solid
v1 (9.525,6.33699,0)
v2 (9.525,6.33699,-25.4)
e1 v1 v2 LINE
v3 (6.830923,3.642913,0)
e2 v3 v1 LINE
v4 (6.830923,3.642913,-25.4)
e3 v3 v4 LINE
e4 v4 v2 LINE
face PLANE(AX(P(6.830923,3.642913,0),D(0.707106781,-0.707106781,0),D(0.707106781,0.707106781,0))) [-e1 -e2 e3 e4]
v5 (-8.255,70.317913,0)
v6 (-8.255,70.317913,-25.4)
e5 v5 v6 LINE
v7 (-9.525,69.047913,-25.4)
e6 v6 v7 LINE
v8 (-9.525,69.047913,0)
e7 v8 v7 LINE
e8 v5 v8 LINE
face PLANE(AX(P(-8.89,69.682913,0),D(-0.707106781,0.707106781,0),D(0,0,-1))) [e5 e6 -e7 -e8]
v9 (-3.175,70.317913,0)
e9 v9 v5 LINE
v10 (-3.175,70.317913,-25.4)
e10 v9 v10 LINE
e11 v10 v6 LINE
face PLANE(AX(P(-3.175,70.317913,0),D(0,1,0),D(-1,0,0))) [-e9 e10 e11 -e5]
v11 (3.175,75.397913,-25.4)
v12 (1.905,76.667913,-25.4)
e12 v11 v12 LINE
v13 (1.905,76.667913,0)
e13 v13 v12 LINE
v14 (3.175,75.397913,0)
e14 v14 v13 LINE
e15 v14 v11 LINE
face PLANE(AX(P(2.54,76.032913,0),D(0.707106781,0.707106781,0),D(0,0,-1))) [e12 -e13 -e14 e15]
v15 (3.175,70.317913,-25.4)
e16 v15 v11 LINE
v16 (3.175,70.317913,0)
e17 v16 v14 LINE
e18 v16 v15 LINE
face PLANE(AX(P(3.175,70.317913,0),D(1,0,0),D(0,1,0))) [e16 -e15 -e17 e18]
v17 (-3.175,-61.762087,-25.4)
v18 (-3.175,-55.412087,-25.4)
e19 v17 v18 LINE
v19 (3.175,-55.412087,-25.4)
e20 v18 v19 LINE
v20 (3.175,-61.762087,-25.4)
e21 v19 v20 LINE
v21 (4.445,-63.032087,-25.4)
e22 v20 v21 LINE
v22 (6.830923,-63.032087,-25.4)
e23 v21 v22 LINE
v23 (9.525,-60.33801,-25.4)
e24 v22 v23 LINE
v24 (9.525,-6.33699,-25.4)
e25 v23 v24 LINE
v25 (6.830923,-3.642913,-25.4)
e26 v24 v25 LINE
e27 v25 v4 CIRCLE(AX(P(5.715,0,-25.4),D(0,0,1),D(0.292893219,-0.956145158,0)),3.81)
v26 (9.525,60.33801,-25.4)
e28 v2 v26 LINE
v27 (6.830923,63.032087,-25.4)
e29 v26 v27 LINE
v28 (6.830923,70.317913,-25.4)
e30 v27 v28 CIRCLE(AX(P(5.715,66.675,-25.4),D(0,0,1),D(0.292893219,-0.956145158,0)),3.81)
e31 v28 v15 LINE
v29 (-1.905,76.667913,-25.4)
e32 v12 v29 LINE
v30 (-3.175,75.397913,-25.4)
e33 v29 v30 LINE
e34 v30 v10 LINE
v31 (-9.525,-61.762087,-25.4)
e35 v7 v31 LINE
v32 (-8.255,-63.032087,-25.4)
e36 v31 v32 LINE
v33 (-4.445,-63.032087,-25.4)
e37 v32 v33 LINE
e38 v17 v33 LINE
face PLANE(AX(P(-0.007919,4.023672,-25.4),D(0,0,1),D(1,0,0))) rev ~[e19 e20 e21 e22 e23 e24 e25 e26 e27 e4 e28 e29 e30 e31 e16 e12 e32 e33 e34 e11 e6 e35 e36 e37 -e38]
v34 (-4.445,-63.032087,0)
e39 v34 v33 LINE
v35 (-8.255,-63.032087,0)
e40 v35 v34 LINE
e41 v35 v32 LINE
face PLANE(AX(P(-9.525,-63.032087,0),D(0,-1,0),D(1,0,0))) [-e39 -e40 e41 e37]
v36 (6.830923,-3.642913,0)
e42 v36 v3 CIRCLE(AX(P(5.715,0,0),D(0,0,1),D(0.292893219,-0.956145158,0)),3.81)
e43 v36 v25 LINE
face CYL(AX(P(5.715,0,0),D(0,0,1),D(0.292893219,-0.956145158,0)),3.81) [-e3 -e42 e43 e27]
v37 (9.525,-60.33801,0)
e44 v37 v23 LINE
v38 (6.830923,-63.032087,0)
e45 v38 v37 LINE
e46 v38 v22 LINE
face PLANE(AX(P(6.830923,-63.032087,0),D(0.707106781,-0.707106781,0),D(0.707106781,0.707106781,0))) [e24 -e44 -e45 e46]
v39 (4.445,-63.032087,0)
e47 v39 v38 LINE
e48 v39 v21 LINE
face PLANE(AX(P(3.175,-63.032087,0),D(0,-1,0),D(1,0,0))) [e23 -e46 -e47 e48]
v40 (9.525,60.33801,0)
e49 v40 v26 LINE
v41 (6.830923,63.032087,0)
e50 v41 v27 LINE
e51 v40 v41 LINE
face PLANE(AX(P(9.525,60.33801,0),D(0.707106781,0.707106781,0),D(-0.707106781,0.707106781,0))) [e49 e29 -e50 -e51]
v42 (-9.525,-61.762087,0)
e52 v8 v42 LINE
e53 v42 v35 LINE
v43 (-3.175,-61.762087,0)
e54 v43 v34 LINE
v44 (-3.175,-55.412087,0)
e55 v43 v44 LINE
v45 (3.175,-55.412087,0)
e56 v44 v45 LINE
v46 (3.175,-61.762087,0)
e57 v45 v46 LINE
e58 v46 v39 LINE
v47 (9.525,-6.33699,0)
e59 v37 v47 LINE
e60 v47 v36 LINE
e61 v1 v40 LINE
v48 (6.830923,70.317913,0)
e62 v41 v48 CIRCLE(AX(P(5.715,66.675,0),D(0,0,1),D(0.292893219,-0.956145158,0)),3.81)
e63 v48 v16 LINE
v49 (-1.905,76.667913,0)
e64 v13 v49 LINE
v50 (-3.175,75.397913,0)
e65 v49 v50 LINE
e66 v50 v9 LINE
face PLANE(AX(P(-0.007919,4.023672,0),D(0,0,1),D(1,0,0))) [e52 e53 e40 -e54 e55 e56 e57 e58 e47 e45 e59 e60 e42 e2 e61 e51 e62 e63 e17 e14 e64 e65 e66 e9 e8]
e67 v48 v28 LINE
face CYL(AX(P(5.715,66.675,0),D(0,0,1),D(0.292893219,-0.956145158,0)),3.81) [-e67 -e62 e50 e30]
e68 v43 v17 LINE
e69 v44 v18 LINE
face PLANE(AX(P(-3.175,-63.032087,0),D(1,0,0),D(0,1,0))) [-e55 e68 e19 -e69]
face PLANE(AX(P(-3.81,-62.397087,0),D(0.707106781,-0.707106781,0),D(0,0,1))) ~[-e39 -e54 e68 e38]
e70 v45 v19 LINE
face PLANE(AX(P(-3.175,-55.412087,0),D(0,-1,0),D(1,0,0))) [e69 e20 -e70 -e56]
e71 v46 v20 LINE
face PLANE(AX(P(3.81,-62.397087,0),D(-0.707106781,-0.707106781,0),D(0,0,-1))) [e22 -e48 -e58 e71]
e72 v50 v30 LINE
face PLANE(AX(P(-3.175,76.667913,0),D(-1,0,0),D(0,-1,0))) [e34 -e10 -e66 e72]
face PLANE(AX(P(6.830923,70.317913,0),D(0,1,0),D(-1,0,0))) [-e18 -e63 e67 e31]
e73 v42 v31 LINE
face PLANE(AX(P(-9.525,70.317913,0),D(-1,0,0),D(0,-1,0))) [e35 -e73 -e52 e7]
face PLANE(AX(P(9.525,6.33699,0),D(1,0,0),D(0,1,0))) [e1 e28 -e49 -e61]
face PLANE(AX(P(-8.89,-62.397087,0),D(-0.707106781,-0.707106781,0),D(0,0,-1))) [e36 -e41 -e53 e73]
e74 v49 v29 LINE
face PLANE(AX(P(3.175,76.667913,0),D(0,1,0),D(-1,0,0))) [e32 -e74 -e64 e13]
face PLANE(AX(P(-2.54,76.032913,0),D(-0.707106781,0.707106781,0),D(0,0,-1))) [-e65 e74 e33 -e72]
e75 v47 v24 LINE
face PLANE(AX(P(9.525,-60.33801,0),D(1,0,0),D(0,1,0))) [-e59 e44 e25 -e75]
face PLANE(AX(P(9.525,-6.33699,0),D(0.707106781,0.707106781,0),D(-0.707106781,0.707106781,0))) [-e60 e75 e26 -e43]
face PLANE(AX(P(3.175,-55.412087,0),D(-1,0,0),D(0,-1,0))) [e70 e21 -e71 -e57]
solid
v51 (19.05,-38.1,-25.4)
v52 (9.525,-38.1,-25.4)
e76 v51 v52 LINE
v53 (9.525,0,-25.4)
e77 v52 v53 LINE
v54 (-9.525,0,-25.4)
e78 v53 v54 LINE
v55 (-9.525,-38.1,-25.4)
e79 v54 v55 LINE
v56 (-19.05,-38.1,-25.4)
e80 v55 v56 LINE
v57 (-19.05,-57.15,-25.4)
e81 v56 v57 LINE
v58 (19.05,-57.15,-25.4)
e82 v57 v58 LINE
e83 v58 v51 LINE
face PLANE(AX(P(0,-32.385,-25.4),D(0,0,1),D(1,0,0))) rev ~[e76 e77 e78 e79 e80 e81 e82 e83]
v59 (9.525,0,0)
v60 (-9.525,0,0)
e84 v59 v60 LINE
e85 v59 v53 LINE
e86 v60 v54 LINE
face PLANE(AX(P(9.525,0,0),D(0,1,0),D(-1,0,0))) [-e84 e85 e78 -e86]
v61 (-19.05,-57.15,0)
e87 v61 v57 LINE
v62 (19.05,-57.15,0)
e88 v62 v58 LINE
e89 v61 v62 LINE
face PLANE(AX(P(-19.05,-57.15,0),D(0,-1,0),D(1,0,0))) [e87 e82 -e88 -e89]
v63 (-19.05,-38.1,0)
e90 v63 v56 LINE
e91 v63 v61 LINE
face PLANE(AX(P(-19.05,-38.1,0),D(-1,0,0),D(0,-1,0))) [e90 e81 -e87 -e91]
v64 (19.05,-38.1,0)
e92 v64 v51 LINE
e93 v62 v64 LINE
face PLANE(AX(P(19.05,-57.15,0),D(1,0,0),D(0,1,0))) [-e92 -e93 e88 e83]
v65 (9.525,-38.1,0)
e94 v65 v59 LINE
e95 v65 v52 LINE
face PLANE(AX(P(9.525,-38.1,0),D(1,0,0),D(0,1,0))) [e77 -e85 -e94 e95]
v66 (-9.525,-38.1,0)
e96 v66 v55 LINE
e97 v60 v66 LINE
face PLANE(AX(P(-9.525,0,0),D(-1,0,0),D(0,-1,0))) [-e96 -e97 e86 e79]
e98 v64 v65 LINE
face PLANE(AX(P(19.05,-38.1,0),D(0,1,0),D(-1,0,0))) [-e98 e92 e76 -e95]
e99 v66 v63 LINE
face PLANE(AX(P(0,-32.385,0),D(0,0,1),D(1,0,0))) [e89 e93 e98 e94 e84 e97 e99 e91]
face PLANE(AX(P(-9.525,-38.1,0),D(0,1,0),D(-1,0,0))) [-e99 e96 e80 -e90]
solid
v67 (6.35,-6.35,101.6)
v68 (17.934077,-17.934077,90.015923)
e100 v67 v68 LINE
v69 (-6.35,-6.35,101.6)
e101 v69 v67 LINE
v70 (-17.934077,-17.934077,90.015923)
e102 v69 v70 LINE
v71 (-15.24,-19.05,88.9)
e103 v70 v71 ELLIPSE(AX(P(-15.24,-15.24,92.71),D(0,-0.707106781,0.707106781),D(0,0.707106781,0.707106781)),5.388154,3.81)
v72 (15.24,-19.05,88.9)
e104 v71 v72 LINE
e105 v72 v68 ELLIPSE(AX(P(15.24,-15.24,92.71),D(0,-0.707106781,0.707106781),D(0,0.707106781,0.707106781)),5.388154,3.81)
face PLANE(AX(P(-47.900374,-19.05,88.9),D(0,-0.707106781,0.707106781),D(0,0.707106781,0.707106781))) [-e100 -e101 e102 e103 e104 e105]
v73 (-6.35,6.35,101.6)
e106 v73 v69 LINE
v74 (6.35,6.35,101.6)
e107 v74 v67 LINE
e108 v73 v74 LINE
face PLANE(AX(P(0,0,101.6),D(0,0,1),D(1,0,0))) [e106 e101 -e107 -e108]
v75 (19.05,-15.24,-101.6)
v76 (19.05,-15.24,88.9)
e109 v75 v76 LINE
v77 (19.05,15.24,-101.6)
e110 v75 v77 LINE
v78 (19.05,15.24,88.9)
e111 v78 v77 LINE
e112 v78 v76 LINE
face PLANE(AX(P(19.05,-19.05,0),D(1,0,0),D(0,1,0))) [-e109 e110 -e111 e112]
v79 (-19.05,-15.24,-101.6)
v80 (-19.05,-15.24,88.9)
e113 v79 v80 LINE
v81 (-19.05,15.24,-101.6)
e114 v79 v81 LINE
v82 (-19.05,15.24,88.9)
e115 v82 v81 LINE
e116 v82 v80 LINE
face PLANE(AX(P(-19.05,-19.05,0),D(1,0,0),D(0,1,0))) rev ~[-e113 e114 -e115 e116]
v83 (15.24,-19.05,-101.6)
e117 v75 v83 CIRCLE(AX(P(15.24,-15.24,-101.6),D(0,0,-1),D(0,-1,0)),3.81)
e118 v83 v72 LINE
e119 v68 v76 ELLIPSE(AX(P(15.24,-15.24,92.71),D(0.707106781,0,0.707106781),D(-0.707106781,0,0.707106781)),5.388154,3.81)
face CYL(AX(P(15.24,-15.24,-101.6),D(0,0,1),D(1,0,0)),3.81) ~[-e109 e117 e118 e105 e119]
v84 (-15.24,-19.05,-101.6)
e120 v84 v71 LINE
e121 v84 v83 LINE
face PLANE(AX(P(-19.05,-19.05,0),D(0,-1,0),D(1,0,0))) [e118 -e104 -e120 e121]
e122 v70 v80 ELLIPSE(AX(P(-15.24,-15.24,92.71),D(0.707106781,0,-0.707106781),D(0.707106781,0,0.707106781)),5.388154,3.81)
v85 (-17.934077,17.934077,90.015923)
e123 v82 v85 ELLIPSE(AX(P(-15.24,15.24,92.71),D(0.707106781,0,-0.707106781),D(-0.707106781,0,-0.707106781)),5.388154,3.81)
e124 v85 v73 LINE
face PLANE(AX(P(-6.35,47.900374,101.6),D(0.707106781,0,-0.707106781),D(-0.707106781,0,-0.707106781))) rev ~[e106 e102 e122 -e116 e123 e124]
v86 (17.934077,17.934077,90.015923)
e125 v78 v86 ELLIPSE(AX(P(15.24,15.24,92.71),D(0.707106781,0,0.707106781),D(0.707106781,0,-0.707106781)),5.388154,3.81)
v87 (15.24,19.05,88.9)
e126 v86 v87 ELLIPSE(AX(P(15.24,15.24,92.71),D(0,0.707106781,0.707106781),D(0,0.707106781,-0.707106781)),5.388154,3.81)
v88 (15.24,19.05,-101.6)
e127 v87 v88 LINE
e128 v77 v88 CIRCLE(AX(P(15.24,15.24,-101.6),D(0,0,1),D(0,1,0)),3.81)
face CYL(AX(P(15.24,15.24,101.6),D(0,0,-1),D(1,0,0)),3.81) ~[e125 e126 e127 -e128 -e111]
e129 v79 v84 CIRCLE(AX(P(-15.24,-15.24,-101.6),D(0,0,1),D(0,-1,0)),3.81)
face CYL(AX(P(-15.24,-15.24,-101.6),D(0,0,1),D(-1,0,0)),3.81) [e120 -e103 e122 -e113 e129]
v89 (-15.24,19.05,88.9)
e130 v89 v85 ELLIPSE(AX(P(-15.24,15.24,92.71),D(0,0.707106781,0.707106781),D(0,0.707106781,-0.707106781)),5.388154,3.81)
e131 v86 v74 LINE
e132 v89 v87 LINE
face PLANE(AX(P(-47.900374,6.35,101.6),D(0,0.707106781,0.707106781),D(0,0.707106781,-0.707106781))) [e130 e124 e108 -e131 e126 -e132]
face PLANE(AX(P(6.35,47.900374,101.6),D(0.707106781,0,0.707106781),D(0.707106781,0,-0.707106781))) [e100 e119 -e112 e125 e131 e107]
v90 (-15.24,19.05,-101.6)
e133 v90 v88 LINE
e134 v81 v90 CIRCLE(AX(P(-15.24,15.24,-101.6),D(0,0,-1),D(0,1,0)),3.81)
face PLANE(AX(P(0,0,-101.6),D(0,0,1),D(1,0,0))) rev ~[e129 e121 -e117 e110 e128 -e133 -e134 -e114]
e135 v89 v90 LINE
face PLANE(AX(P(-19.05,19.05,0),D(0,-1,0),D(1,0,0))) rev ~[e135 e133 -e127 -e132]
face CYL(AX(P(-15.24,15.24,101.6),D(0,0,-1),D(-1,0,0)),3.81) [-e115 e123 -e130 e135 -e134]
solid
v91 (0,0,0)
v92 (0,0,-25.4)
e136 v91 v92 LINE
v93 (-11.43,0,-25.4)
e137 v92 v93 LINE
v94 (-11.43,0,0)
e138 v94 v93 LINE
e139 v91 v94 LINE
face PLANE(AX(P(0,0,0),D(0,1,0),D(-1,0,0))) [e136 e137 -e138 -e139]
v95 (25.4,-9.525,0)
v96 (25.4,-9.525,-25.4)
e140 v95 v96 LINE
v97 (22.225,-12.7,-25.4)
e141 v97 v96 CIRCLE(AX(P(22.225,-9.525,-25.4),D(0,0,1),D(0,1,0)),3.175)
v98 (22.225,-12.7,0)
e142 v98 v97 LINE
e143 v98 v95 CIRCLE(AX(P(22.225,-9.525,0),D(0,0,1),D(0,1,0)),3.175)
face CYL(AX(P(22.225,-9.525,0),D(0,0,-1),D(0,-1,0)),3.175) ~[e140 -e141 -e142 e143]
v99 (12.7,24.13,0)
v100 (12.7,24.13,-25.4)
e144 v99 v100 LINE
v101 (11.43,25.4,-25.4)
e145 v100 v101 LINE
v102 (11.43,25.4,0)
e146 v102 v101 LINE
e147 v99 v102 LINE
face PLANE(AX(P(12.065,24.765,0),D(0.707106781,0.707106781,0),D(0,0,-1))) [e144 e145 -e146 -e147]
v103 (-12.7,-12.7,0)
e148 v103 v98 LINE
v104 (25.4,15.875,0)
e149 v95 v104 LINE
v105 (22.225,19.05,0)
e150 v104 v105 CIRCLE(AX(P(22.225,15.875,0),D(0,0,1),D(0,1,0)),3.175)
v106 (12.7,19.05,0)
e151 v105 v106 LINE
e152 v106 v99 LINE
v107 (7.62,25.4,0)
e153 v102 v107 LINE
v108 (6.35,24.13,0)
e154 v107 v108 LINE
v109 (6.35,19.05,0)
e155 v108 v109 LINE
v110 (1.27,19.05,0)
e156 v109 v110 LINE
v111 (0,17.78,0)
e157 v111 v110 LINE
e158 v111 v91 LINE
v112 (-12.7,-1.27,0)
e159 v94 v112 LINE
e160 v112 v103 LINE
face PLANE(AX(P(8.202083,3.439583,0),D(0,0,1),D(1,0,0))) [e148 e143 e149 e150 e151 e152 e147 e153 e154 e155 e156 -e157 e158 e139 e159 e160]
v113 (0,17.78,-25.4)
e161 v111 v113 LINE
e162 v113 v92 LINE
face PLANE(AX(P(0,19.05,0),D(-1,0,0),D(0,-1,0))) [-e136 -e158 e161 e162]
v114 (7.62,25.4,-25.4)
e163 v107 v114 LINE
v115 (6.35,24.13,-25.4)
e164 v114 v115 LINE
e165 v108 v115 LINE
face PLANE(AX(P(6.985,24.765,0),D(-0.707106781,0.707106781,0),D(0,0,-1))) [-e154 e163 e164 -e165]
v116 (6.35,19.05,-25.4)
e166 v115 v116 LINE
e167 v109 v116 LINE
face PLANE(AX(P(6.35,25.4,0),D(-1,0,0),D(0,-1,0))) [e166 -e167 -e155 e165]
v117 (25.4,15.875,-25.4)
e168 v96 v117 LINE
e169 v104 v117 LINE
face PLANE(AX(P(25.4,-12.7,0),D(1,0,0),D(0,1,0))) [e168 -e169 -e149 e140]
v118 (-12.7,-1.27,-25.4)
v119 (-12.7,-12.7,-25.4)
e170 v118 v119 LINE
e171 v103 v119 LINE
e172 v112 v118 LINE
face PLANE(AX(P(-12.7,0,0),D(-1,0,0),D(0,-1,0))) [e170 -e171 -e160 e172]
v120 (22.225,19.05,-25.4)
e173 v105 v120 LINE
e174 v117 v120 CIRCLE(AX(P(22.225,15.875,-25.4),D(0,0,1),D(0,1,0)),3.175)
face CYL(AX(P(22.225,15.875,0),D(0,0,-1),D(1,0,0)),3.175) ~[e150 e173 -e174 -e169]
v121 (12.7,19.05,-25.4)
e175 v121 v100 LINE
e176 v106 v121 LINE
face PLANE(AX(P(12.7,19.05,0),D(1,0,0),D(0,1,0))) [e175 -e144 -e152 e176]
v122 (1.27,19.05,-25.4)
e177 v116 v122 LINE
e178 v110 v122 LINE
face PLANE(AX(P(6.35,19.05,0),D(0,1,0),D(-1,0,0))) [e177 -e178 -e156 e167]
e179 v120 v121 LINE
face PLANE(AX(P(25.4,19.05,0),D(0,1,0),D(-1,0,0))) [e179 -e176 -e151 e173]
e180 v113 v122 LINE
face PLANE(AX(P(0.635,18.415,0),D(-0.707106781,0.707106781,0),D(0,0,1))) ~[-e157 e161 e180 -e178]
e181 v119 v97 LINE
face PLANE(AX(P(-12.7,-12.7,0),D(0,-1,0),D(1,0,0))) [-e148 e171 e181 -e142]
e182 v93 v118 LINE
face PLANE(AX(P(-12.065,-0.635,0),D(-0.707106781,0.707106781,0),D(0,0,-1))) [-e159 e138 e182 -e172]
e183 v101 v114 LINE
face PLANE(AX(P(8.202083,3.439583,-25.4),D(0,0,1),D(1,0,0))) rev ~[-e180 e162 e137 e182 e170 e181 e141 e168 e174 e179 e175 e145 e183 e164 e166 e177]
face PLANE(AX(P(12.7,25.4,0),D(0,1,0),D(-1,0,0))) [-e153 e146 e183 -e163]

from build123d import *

# Parameters (mm, degrees)
F1_DEPTH      = 25.4
F2_SIZE       = 1.27
F4_DEPTH      = 25.4
F5_SIZE       = 1.27
F6_R          = 3.175
F7_W          = 38.1
F7_H          = 38.1
F8_DEPTH      = 101.6
F9_R          = 3.81
F10_T1_DEPTH  = 95.8007478943
F10_T3_DEPTH  = 95.8007478943
F10_T8_ANGLE  = 90
F10_T13_ANGLE = 90
F10_T18_ANGLE = 90
F10_T23_ANGLE = 90
F10_T28_ANGLE = 90
F10_T33_ANGLE = 90
F10_T38_ANGLE = 90
F10_T43_ANGLE = 90
F12_DEPTH     = 25.4


# Not quite as in the source:
# - a fillet or chamfer that OpenCascade refuses, or shapes differently, is made with other operations: its cross-section is extruded or revolved along the edge and cut away or added


with BuildPart() as f1:
    # F0 (on Top) → F1 (new body)
    with BuildSketch(Plane.XY):
        with BuildLine():
            Line((-3.175, -63.0320869496), (-3.175, -55.4120869496))
            Line((-3.175, -55.4120869496), (3.175, -55.4120869496))
            Line((3.175, -55.4120869496), (3.175, -63.0320869496))
            Line((3.175, -63.0320869496), (6.8309231637, -63.0320869496))
            Line((6.8309231637, -63.0320869496), (9.525, -60.3380101133))
            Line((9.525, -60.3380101133), (9.525, -6.3369898867))
            Line((9.525, -6.3369898867), (6.8309231637, -3.6429130504))
            ThreePointArc((6.8309231637, -3.6429130504), (9.525, 0), (6.8309231637, 3.6429130504))
            Line((6.8309231637, 3.6429130504), (9.525, 6.3369898867))
            Line((9.525, 6.3369898867), (9.525, 60.3380101133))
            Line((9.525, 60.3380101133), (6.8309231637, 63.0320869496))
            ThreePointArc((6.8309231637, 63.0320869496), (9.525, 66.675), (6.8309231637, 70.3179130504))
            Line((6.8309231637, 70.3179130504), (3.175, 70.3179130504))
            Line((3.175, 70.3179130504), (3.175, 76.6679130504))
            Line((3.175, 76.6679130504), (-3.175, 76.6679130504))
            Line((-3.175, 76.6679130504), (-3.175, 70.3179130504))
            Line((-3.175, 70.3179130504), (-9.525, 70.3179130504))
            Line((-9.525, 70.3179130504), (-9.525, -63.0320869496))
            Line((-9.525, -63.0320869496), (-3.175, -63.0320869496))
        make_face()
    extrude(amount=-F1_DEPTH)

    # F2
    f2_edges = [f1.edges().sort_by_distance(p)[0] for p in [
        (-3.175, 76.667913, -12.7),
        (-9.525, 70.317913, -12.7),
        (3.175, 76.667913, -12.7),
        (-9.525, -63.032087, -12.7),
        (-3.175, -63.032087, -12.7),
        (3.175, -63.032087, -12.7),
    ]]
    chamfer(f2_edges, length=F2_SIZE)


with BuildPart() as f4:
    # F3 (on Top) → F4 (new body)
    with BuildSketch(Plane.XY):
        Polygon((0, 19.05), (0, 0), (-12.7, 0), (-12.7, -12.7), (25.4, -12.7), (25.4, 19.05), (12.7, 19.05), (12.7, 25.4), (6.35, 25.4), (6.35, 19.05), align=None)
    extrude(amount=-F4_DEPTH)

    # F5
    f5_edges = [f4.edges().sort_by_distance(p)[0] for p in [
        (12.7, 25.4, -12.7),
        (6.35, 25.4, -12.7),
        (0, 19.05, -12.7),
        (-12.7, 0, -12.7),
    ]]
    chamfer(f5_edges, length=F5_SIZE)

    # F6
    f6_edges = [f4.edges().sort_by_distance(p)[0] for p in [
        (25.4, 19.05, -12.7),
        (25.4, -12.7, -12.7),
    ]]
    fillet(f6_edges, radius=F6_R)


with BuildPart() as f8:
    # F7 (on Top) → F8 (new body, symmetric)
    with BuildSketch(Plane.XY):
        Rectangle(F7_W, F7_H)
    extrude(amount=F8_DEPTH, both=True)

    # F9
    f9_edges = [f8.edges().sort_by_distance(p)[0] for p in [
        (-19.05, -19.05, 0),
        (19.05, -19.05, 0),
        (19.05, 19.05, 0),
        (-19.05, 19.05, 0),
    ]]
    fillet(f9_edges, radius=F9_R)

    # F10: chamfer of 12.7 on 4 edges, made by hand

    # F10_s2 → F10_t1 (cut)
    with BuildSketch(Plane.YZ.offset(-47.9003739472)):
        Polygon((6.35, 101.6), (19.05, 88.9), (19.05, 101.6), align=None)
        Polygon((-19.05, 88.9), (-6.35, 101.6), (-19.05, 101.6), align=None)
    extrude(amount=F10_T1_DEPTH, mode=Mode.SUBTRACT)

    # F10_s4 → F10_t3 (cut)
    with BuildSketch(Plane.XZ.offset(-47.9003739472)):
        Polygon((-6.35, 101.6), (-19.05, 88.9), (-19.05, 101.6), align=None)
        Polygon((6.35, 101.6), (19.05, 88.9), (19.05, 101.6), align=None)
    extrude(amount=F10_T3_DEPTH, mode=Mode.SUBTRACT)


with BuildPart() as f10_tool6:
    # F10_s7 → F10_t8 (revolve)
    with BuildSketch(Plane.YZ.offset(15.24)):
        Polygon((-19.05, 88.9), (-15.24, 92.71), (-15.24, 101.6), (-19.05, 101.6), align=None)
    revolve(axis=Axis((15.24, -15.24, 101.6), (0, 0, 1)), revolution_arc=F10_T8_ANGLE)

    split(bisect_by=Plane(origin=(0, -53.975, 53.975), x_dir=(1, 0, 0), z_dir=(0, -0.7071067812, 0.7071067812)), keep=Keep.TOP)


with BuildPart() as f8_1:
    add(f8.part)

    # F10_t5: cut F10_tool6
    add(f10_tool6.part, mode=Mode.SUBTRACT)


with BuildPart() as f10_tool11:
    # F10_s12 → F10_t13 (revolve)
    with BuildSketch(Plane.YZ.offset(15.24)):
        Polygon((-19.05, 88.9), (-15.24, 92.71), (-15.24, 101.6), (-19.05, 101.6), align=None)
    revolve(axis=Axis((15.24, -15.24, 101.6), (0, 0, 1)), revolution_arc=F10_T13_ANGLE)

    split(bisect_by=Plane(origin=(53.975, 0, 53.975), x_dir=(0, 1, 0), z_dir=(0.7071067812, 0, 0.7071067812)), keep=Keep.TOP)


with BuildPart() as f8_2:
    add(f8_1.part)

    # F10_t10: cut F10_tool11
    add(f10_tool11.part, mode=Mode.SUBTRACT)


with BuildPart() as f10_tool16:
    # F10_s17 → F10_t18 (revolve)
    with BuildSketch(Plane.YZ.offset(15.24)):
        Polygon((15.24, 92.71), (19.05, 88.9), (19.05, 101.6), (15.24, 101.6), align=None)
    revolve(axis=Axis((15.24, 15.24, 101.6), (0, 0, -1)), revolution_arc=F10_T18_ANGLE)

    split(bisect_by=Plane(origin=(0, 53.975, 53.975), x_dir=(1, 0, 0), z_dir=(0, 0.7071067812, 0.7071067812)), keep=Keep.TOP)


with BuildPart() as f8_3:
    add(f8_2.part)

    # F10_t15: cut F10_tool16
    add(f10_tool16.part, mode=Mode.SUBTRACT)


with BuildPart() as f10_tool21:
    # F10_s22 → F10_t23 (revolve)
    with BuildSketch(Plane.YZ.offset(15.24)):
        Polygon((15.24, 92.71), (19.05, 88.9), (19.05, 101.6), (15.24, 101.6), align=None)
    revolve(axis=Axis((15.24, 15.24, 101.6), (0, 0, -1)), revolution_arc=F10_T23_ANGLE)

    split(bisect_by=Plane(origin=(53.975, 0, 53.975), x_dir=(0, 1, 0), z_dir=(0.7071067812, 0, 0.7071067812)), keep=Keep.TOP)


with BuildPart() as f8_4:
    add(f8_3.part)

    # F10_t20: cut F10_tool21
    add(f10_tool21.part, mode=Mode.SUBTRACT)


with BuildPart() as f10_tool26:
    # F10_s27 → F10_t28 (revolve)
    with BuildSketch(Plane.YZ.offset(-15.24)):
        Polygon((-19.05, 88.9), (-15.24, 92.71), (-15.24, 101.6), (-19.05, 101.6), align=None)
    revolve(axis=Axis((-15.24, -15.24, 101.6), (0, 0, -1)), revolution_arc=F10_T28_ANGLE)

    split(bisect_by=Plane(origin=(0, -53.975, 53.975), x_dir=(1, 0, 0), z_dir=(0, -0.7071067812, 0.7071067812)), keep=Keep.TOP)


with BuildPart() as f8_5:
    add(f8_4.part)

    # F10_t25: cut F10_tool26
    add(f10_tool26.part, mode=Mode.SUBTRACT)


with BuildPart() as f10_tool31:
    # F10_s32 → F10_t33 (revolve)
    with BuildSketch(Plane.YZ.offset(-15.24)):
        Polygon((-19.05, 88.9), (-15.24, 92.71), (-15.24, 101.6), (-19.05, 101.6), align=None)
    revolve(axis=Axis((-15.24, -15.24, 101.6), (0, 0, -1)), revolution_arc=F10_T33_ANGLE)

    split(bisect_by=Plane(origin=(-53.975, 0, 53.975), x_dir=(0, 1, 0), z_dir=(-0.7071067812, 0, 0.7071067812)), keep=Keep.TOP)


with BuildPart() as f8_6:
    add(f8_5.part)

    # F10_t30: cut F10_tool31
    add(f10_tool31.part, mode=Mode.SUBTRACT)


with BuildPart() as f10_tool36:
    # F10_s37 → F10_t38 (revolve)
    with BuildSketch(Plane.XZ.offset(-15.24)):
        Polygon((-15.24, 92.71), (-19.05, 88.9), (-19.05, 101.6), (-15.24, 101.6), align=None)
    revolve(axis=Axis((-15.24, 15.24, 101.6), (0, 0, -1)), revolution_arc=F10_T38_ANGLE)

    split(bisect_by=Plane(origin=(-53.975, 0, 53.975), x_dir=(0, 1, 0), z_dir=(-0.7071067812, 0, 0.7071067812)), keep=Keep.TOP)


with BuildPart() as f8_7:
    add(f8_6.part)

    # F10_t35: cut F10_tool36
    add(f10_tool36.part, mode=Mode.SUBTRACT)


with BuildPart() as f10_tool41:
    # F10_s42 → F10_t43 (revolve)
    with BuildSketch(Plane.XZ.offset(-15.24)):
        Polygon((-15.24, 92.71), (-19.05, 88.9), (-19.05, 101.6), (-15.24, 101.6), align=None)
    revolve(axis=Axis((-15.24, 15.24, 101.6), (0, 0, -1)), revolution_arc=F10_T43_ANGLE)

    split(bisect_by=Plane(origin=(0, 53.975, 53.975), x_dir=(1, 0, 0), z_dir=(0, 0.7071067812, 0.7071067812)), keep=Keep.TOP)


with BuildPart() as f8_8:
    add(f8_7.part)

    # F10_t40: cut F10_tool41
    add(f10_tool41.part, mode=Mode.SUBTRACT)


with BuildPart() as f12:
    # F11 (on Top) → F12 (new body)
    with BuildSketch(Plane.XY):
        Polygon((19.05, -57.15), (19.05, -38.1), (9.525, -38.1), (9.525, 0), (-9.525, 0), (-9.525, -38.1), (-19.05, -38.1), (-19.05, -57.15), align=None)
    extrude(amount=-F12_DEPTH)


solid = Compound([f1.part, f4.part, f8_8.part, f12.part])
